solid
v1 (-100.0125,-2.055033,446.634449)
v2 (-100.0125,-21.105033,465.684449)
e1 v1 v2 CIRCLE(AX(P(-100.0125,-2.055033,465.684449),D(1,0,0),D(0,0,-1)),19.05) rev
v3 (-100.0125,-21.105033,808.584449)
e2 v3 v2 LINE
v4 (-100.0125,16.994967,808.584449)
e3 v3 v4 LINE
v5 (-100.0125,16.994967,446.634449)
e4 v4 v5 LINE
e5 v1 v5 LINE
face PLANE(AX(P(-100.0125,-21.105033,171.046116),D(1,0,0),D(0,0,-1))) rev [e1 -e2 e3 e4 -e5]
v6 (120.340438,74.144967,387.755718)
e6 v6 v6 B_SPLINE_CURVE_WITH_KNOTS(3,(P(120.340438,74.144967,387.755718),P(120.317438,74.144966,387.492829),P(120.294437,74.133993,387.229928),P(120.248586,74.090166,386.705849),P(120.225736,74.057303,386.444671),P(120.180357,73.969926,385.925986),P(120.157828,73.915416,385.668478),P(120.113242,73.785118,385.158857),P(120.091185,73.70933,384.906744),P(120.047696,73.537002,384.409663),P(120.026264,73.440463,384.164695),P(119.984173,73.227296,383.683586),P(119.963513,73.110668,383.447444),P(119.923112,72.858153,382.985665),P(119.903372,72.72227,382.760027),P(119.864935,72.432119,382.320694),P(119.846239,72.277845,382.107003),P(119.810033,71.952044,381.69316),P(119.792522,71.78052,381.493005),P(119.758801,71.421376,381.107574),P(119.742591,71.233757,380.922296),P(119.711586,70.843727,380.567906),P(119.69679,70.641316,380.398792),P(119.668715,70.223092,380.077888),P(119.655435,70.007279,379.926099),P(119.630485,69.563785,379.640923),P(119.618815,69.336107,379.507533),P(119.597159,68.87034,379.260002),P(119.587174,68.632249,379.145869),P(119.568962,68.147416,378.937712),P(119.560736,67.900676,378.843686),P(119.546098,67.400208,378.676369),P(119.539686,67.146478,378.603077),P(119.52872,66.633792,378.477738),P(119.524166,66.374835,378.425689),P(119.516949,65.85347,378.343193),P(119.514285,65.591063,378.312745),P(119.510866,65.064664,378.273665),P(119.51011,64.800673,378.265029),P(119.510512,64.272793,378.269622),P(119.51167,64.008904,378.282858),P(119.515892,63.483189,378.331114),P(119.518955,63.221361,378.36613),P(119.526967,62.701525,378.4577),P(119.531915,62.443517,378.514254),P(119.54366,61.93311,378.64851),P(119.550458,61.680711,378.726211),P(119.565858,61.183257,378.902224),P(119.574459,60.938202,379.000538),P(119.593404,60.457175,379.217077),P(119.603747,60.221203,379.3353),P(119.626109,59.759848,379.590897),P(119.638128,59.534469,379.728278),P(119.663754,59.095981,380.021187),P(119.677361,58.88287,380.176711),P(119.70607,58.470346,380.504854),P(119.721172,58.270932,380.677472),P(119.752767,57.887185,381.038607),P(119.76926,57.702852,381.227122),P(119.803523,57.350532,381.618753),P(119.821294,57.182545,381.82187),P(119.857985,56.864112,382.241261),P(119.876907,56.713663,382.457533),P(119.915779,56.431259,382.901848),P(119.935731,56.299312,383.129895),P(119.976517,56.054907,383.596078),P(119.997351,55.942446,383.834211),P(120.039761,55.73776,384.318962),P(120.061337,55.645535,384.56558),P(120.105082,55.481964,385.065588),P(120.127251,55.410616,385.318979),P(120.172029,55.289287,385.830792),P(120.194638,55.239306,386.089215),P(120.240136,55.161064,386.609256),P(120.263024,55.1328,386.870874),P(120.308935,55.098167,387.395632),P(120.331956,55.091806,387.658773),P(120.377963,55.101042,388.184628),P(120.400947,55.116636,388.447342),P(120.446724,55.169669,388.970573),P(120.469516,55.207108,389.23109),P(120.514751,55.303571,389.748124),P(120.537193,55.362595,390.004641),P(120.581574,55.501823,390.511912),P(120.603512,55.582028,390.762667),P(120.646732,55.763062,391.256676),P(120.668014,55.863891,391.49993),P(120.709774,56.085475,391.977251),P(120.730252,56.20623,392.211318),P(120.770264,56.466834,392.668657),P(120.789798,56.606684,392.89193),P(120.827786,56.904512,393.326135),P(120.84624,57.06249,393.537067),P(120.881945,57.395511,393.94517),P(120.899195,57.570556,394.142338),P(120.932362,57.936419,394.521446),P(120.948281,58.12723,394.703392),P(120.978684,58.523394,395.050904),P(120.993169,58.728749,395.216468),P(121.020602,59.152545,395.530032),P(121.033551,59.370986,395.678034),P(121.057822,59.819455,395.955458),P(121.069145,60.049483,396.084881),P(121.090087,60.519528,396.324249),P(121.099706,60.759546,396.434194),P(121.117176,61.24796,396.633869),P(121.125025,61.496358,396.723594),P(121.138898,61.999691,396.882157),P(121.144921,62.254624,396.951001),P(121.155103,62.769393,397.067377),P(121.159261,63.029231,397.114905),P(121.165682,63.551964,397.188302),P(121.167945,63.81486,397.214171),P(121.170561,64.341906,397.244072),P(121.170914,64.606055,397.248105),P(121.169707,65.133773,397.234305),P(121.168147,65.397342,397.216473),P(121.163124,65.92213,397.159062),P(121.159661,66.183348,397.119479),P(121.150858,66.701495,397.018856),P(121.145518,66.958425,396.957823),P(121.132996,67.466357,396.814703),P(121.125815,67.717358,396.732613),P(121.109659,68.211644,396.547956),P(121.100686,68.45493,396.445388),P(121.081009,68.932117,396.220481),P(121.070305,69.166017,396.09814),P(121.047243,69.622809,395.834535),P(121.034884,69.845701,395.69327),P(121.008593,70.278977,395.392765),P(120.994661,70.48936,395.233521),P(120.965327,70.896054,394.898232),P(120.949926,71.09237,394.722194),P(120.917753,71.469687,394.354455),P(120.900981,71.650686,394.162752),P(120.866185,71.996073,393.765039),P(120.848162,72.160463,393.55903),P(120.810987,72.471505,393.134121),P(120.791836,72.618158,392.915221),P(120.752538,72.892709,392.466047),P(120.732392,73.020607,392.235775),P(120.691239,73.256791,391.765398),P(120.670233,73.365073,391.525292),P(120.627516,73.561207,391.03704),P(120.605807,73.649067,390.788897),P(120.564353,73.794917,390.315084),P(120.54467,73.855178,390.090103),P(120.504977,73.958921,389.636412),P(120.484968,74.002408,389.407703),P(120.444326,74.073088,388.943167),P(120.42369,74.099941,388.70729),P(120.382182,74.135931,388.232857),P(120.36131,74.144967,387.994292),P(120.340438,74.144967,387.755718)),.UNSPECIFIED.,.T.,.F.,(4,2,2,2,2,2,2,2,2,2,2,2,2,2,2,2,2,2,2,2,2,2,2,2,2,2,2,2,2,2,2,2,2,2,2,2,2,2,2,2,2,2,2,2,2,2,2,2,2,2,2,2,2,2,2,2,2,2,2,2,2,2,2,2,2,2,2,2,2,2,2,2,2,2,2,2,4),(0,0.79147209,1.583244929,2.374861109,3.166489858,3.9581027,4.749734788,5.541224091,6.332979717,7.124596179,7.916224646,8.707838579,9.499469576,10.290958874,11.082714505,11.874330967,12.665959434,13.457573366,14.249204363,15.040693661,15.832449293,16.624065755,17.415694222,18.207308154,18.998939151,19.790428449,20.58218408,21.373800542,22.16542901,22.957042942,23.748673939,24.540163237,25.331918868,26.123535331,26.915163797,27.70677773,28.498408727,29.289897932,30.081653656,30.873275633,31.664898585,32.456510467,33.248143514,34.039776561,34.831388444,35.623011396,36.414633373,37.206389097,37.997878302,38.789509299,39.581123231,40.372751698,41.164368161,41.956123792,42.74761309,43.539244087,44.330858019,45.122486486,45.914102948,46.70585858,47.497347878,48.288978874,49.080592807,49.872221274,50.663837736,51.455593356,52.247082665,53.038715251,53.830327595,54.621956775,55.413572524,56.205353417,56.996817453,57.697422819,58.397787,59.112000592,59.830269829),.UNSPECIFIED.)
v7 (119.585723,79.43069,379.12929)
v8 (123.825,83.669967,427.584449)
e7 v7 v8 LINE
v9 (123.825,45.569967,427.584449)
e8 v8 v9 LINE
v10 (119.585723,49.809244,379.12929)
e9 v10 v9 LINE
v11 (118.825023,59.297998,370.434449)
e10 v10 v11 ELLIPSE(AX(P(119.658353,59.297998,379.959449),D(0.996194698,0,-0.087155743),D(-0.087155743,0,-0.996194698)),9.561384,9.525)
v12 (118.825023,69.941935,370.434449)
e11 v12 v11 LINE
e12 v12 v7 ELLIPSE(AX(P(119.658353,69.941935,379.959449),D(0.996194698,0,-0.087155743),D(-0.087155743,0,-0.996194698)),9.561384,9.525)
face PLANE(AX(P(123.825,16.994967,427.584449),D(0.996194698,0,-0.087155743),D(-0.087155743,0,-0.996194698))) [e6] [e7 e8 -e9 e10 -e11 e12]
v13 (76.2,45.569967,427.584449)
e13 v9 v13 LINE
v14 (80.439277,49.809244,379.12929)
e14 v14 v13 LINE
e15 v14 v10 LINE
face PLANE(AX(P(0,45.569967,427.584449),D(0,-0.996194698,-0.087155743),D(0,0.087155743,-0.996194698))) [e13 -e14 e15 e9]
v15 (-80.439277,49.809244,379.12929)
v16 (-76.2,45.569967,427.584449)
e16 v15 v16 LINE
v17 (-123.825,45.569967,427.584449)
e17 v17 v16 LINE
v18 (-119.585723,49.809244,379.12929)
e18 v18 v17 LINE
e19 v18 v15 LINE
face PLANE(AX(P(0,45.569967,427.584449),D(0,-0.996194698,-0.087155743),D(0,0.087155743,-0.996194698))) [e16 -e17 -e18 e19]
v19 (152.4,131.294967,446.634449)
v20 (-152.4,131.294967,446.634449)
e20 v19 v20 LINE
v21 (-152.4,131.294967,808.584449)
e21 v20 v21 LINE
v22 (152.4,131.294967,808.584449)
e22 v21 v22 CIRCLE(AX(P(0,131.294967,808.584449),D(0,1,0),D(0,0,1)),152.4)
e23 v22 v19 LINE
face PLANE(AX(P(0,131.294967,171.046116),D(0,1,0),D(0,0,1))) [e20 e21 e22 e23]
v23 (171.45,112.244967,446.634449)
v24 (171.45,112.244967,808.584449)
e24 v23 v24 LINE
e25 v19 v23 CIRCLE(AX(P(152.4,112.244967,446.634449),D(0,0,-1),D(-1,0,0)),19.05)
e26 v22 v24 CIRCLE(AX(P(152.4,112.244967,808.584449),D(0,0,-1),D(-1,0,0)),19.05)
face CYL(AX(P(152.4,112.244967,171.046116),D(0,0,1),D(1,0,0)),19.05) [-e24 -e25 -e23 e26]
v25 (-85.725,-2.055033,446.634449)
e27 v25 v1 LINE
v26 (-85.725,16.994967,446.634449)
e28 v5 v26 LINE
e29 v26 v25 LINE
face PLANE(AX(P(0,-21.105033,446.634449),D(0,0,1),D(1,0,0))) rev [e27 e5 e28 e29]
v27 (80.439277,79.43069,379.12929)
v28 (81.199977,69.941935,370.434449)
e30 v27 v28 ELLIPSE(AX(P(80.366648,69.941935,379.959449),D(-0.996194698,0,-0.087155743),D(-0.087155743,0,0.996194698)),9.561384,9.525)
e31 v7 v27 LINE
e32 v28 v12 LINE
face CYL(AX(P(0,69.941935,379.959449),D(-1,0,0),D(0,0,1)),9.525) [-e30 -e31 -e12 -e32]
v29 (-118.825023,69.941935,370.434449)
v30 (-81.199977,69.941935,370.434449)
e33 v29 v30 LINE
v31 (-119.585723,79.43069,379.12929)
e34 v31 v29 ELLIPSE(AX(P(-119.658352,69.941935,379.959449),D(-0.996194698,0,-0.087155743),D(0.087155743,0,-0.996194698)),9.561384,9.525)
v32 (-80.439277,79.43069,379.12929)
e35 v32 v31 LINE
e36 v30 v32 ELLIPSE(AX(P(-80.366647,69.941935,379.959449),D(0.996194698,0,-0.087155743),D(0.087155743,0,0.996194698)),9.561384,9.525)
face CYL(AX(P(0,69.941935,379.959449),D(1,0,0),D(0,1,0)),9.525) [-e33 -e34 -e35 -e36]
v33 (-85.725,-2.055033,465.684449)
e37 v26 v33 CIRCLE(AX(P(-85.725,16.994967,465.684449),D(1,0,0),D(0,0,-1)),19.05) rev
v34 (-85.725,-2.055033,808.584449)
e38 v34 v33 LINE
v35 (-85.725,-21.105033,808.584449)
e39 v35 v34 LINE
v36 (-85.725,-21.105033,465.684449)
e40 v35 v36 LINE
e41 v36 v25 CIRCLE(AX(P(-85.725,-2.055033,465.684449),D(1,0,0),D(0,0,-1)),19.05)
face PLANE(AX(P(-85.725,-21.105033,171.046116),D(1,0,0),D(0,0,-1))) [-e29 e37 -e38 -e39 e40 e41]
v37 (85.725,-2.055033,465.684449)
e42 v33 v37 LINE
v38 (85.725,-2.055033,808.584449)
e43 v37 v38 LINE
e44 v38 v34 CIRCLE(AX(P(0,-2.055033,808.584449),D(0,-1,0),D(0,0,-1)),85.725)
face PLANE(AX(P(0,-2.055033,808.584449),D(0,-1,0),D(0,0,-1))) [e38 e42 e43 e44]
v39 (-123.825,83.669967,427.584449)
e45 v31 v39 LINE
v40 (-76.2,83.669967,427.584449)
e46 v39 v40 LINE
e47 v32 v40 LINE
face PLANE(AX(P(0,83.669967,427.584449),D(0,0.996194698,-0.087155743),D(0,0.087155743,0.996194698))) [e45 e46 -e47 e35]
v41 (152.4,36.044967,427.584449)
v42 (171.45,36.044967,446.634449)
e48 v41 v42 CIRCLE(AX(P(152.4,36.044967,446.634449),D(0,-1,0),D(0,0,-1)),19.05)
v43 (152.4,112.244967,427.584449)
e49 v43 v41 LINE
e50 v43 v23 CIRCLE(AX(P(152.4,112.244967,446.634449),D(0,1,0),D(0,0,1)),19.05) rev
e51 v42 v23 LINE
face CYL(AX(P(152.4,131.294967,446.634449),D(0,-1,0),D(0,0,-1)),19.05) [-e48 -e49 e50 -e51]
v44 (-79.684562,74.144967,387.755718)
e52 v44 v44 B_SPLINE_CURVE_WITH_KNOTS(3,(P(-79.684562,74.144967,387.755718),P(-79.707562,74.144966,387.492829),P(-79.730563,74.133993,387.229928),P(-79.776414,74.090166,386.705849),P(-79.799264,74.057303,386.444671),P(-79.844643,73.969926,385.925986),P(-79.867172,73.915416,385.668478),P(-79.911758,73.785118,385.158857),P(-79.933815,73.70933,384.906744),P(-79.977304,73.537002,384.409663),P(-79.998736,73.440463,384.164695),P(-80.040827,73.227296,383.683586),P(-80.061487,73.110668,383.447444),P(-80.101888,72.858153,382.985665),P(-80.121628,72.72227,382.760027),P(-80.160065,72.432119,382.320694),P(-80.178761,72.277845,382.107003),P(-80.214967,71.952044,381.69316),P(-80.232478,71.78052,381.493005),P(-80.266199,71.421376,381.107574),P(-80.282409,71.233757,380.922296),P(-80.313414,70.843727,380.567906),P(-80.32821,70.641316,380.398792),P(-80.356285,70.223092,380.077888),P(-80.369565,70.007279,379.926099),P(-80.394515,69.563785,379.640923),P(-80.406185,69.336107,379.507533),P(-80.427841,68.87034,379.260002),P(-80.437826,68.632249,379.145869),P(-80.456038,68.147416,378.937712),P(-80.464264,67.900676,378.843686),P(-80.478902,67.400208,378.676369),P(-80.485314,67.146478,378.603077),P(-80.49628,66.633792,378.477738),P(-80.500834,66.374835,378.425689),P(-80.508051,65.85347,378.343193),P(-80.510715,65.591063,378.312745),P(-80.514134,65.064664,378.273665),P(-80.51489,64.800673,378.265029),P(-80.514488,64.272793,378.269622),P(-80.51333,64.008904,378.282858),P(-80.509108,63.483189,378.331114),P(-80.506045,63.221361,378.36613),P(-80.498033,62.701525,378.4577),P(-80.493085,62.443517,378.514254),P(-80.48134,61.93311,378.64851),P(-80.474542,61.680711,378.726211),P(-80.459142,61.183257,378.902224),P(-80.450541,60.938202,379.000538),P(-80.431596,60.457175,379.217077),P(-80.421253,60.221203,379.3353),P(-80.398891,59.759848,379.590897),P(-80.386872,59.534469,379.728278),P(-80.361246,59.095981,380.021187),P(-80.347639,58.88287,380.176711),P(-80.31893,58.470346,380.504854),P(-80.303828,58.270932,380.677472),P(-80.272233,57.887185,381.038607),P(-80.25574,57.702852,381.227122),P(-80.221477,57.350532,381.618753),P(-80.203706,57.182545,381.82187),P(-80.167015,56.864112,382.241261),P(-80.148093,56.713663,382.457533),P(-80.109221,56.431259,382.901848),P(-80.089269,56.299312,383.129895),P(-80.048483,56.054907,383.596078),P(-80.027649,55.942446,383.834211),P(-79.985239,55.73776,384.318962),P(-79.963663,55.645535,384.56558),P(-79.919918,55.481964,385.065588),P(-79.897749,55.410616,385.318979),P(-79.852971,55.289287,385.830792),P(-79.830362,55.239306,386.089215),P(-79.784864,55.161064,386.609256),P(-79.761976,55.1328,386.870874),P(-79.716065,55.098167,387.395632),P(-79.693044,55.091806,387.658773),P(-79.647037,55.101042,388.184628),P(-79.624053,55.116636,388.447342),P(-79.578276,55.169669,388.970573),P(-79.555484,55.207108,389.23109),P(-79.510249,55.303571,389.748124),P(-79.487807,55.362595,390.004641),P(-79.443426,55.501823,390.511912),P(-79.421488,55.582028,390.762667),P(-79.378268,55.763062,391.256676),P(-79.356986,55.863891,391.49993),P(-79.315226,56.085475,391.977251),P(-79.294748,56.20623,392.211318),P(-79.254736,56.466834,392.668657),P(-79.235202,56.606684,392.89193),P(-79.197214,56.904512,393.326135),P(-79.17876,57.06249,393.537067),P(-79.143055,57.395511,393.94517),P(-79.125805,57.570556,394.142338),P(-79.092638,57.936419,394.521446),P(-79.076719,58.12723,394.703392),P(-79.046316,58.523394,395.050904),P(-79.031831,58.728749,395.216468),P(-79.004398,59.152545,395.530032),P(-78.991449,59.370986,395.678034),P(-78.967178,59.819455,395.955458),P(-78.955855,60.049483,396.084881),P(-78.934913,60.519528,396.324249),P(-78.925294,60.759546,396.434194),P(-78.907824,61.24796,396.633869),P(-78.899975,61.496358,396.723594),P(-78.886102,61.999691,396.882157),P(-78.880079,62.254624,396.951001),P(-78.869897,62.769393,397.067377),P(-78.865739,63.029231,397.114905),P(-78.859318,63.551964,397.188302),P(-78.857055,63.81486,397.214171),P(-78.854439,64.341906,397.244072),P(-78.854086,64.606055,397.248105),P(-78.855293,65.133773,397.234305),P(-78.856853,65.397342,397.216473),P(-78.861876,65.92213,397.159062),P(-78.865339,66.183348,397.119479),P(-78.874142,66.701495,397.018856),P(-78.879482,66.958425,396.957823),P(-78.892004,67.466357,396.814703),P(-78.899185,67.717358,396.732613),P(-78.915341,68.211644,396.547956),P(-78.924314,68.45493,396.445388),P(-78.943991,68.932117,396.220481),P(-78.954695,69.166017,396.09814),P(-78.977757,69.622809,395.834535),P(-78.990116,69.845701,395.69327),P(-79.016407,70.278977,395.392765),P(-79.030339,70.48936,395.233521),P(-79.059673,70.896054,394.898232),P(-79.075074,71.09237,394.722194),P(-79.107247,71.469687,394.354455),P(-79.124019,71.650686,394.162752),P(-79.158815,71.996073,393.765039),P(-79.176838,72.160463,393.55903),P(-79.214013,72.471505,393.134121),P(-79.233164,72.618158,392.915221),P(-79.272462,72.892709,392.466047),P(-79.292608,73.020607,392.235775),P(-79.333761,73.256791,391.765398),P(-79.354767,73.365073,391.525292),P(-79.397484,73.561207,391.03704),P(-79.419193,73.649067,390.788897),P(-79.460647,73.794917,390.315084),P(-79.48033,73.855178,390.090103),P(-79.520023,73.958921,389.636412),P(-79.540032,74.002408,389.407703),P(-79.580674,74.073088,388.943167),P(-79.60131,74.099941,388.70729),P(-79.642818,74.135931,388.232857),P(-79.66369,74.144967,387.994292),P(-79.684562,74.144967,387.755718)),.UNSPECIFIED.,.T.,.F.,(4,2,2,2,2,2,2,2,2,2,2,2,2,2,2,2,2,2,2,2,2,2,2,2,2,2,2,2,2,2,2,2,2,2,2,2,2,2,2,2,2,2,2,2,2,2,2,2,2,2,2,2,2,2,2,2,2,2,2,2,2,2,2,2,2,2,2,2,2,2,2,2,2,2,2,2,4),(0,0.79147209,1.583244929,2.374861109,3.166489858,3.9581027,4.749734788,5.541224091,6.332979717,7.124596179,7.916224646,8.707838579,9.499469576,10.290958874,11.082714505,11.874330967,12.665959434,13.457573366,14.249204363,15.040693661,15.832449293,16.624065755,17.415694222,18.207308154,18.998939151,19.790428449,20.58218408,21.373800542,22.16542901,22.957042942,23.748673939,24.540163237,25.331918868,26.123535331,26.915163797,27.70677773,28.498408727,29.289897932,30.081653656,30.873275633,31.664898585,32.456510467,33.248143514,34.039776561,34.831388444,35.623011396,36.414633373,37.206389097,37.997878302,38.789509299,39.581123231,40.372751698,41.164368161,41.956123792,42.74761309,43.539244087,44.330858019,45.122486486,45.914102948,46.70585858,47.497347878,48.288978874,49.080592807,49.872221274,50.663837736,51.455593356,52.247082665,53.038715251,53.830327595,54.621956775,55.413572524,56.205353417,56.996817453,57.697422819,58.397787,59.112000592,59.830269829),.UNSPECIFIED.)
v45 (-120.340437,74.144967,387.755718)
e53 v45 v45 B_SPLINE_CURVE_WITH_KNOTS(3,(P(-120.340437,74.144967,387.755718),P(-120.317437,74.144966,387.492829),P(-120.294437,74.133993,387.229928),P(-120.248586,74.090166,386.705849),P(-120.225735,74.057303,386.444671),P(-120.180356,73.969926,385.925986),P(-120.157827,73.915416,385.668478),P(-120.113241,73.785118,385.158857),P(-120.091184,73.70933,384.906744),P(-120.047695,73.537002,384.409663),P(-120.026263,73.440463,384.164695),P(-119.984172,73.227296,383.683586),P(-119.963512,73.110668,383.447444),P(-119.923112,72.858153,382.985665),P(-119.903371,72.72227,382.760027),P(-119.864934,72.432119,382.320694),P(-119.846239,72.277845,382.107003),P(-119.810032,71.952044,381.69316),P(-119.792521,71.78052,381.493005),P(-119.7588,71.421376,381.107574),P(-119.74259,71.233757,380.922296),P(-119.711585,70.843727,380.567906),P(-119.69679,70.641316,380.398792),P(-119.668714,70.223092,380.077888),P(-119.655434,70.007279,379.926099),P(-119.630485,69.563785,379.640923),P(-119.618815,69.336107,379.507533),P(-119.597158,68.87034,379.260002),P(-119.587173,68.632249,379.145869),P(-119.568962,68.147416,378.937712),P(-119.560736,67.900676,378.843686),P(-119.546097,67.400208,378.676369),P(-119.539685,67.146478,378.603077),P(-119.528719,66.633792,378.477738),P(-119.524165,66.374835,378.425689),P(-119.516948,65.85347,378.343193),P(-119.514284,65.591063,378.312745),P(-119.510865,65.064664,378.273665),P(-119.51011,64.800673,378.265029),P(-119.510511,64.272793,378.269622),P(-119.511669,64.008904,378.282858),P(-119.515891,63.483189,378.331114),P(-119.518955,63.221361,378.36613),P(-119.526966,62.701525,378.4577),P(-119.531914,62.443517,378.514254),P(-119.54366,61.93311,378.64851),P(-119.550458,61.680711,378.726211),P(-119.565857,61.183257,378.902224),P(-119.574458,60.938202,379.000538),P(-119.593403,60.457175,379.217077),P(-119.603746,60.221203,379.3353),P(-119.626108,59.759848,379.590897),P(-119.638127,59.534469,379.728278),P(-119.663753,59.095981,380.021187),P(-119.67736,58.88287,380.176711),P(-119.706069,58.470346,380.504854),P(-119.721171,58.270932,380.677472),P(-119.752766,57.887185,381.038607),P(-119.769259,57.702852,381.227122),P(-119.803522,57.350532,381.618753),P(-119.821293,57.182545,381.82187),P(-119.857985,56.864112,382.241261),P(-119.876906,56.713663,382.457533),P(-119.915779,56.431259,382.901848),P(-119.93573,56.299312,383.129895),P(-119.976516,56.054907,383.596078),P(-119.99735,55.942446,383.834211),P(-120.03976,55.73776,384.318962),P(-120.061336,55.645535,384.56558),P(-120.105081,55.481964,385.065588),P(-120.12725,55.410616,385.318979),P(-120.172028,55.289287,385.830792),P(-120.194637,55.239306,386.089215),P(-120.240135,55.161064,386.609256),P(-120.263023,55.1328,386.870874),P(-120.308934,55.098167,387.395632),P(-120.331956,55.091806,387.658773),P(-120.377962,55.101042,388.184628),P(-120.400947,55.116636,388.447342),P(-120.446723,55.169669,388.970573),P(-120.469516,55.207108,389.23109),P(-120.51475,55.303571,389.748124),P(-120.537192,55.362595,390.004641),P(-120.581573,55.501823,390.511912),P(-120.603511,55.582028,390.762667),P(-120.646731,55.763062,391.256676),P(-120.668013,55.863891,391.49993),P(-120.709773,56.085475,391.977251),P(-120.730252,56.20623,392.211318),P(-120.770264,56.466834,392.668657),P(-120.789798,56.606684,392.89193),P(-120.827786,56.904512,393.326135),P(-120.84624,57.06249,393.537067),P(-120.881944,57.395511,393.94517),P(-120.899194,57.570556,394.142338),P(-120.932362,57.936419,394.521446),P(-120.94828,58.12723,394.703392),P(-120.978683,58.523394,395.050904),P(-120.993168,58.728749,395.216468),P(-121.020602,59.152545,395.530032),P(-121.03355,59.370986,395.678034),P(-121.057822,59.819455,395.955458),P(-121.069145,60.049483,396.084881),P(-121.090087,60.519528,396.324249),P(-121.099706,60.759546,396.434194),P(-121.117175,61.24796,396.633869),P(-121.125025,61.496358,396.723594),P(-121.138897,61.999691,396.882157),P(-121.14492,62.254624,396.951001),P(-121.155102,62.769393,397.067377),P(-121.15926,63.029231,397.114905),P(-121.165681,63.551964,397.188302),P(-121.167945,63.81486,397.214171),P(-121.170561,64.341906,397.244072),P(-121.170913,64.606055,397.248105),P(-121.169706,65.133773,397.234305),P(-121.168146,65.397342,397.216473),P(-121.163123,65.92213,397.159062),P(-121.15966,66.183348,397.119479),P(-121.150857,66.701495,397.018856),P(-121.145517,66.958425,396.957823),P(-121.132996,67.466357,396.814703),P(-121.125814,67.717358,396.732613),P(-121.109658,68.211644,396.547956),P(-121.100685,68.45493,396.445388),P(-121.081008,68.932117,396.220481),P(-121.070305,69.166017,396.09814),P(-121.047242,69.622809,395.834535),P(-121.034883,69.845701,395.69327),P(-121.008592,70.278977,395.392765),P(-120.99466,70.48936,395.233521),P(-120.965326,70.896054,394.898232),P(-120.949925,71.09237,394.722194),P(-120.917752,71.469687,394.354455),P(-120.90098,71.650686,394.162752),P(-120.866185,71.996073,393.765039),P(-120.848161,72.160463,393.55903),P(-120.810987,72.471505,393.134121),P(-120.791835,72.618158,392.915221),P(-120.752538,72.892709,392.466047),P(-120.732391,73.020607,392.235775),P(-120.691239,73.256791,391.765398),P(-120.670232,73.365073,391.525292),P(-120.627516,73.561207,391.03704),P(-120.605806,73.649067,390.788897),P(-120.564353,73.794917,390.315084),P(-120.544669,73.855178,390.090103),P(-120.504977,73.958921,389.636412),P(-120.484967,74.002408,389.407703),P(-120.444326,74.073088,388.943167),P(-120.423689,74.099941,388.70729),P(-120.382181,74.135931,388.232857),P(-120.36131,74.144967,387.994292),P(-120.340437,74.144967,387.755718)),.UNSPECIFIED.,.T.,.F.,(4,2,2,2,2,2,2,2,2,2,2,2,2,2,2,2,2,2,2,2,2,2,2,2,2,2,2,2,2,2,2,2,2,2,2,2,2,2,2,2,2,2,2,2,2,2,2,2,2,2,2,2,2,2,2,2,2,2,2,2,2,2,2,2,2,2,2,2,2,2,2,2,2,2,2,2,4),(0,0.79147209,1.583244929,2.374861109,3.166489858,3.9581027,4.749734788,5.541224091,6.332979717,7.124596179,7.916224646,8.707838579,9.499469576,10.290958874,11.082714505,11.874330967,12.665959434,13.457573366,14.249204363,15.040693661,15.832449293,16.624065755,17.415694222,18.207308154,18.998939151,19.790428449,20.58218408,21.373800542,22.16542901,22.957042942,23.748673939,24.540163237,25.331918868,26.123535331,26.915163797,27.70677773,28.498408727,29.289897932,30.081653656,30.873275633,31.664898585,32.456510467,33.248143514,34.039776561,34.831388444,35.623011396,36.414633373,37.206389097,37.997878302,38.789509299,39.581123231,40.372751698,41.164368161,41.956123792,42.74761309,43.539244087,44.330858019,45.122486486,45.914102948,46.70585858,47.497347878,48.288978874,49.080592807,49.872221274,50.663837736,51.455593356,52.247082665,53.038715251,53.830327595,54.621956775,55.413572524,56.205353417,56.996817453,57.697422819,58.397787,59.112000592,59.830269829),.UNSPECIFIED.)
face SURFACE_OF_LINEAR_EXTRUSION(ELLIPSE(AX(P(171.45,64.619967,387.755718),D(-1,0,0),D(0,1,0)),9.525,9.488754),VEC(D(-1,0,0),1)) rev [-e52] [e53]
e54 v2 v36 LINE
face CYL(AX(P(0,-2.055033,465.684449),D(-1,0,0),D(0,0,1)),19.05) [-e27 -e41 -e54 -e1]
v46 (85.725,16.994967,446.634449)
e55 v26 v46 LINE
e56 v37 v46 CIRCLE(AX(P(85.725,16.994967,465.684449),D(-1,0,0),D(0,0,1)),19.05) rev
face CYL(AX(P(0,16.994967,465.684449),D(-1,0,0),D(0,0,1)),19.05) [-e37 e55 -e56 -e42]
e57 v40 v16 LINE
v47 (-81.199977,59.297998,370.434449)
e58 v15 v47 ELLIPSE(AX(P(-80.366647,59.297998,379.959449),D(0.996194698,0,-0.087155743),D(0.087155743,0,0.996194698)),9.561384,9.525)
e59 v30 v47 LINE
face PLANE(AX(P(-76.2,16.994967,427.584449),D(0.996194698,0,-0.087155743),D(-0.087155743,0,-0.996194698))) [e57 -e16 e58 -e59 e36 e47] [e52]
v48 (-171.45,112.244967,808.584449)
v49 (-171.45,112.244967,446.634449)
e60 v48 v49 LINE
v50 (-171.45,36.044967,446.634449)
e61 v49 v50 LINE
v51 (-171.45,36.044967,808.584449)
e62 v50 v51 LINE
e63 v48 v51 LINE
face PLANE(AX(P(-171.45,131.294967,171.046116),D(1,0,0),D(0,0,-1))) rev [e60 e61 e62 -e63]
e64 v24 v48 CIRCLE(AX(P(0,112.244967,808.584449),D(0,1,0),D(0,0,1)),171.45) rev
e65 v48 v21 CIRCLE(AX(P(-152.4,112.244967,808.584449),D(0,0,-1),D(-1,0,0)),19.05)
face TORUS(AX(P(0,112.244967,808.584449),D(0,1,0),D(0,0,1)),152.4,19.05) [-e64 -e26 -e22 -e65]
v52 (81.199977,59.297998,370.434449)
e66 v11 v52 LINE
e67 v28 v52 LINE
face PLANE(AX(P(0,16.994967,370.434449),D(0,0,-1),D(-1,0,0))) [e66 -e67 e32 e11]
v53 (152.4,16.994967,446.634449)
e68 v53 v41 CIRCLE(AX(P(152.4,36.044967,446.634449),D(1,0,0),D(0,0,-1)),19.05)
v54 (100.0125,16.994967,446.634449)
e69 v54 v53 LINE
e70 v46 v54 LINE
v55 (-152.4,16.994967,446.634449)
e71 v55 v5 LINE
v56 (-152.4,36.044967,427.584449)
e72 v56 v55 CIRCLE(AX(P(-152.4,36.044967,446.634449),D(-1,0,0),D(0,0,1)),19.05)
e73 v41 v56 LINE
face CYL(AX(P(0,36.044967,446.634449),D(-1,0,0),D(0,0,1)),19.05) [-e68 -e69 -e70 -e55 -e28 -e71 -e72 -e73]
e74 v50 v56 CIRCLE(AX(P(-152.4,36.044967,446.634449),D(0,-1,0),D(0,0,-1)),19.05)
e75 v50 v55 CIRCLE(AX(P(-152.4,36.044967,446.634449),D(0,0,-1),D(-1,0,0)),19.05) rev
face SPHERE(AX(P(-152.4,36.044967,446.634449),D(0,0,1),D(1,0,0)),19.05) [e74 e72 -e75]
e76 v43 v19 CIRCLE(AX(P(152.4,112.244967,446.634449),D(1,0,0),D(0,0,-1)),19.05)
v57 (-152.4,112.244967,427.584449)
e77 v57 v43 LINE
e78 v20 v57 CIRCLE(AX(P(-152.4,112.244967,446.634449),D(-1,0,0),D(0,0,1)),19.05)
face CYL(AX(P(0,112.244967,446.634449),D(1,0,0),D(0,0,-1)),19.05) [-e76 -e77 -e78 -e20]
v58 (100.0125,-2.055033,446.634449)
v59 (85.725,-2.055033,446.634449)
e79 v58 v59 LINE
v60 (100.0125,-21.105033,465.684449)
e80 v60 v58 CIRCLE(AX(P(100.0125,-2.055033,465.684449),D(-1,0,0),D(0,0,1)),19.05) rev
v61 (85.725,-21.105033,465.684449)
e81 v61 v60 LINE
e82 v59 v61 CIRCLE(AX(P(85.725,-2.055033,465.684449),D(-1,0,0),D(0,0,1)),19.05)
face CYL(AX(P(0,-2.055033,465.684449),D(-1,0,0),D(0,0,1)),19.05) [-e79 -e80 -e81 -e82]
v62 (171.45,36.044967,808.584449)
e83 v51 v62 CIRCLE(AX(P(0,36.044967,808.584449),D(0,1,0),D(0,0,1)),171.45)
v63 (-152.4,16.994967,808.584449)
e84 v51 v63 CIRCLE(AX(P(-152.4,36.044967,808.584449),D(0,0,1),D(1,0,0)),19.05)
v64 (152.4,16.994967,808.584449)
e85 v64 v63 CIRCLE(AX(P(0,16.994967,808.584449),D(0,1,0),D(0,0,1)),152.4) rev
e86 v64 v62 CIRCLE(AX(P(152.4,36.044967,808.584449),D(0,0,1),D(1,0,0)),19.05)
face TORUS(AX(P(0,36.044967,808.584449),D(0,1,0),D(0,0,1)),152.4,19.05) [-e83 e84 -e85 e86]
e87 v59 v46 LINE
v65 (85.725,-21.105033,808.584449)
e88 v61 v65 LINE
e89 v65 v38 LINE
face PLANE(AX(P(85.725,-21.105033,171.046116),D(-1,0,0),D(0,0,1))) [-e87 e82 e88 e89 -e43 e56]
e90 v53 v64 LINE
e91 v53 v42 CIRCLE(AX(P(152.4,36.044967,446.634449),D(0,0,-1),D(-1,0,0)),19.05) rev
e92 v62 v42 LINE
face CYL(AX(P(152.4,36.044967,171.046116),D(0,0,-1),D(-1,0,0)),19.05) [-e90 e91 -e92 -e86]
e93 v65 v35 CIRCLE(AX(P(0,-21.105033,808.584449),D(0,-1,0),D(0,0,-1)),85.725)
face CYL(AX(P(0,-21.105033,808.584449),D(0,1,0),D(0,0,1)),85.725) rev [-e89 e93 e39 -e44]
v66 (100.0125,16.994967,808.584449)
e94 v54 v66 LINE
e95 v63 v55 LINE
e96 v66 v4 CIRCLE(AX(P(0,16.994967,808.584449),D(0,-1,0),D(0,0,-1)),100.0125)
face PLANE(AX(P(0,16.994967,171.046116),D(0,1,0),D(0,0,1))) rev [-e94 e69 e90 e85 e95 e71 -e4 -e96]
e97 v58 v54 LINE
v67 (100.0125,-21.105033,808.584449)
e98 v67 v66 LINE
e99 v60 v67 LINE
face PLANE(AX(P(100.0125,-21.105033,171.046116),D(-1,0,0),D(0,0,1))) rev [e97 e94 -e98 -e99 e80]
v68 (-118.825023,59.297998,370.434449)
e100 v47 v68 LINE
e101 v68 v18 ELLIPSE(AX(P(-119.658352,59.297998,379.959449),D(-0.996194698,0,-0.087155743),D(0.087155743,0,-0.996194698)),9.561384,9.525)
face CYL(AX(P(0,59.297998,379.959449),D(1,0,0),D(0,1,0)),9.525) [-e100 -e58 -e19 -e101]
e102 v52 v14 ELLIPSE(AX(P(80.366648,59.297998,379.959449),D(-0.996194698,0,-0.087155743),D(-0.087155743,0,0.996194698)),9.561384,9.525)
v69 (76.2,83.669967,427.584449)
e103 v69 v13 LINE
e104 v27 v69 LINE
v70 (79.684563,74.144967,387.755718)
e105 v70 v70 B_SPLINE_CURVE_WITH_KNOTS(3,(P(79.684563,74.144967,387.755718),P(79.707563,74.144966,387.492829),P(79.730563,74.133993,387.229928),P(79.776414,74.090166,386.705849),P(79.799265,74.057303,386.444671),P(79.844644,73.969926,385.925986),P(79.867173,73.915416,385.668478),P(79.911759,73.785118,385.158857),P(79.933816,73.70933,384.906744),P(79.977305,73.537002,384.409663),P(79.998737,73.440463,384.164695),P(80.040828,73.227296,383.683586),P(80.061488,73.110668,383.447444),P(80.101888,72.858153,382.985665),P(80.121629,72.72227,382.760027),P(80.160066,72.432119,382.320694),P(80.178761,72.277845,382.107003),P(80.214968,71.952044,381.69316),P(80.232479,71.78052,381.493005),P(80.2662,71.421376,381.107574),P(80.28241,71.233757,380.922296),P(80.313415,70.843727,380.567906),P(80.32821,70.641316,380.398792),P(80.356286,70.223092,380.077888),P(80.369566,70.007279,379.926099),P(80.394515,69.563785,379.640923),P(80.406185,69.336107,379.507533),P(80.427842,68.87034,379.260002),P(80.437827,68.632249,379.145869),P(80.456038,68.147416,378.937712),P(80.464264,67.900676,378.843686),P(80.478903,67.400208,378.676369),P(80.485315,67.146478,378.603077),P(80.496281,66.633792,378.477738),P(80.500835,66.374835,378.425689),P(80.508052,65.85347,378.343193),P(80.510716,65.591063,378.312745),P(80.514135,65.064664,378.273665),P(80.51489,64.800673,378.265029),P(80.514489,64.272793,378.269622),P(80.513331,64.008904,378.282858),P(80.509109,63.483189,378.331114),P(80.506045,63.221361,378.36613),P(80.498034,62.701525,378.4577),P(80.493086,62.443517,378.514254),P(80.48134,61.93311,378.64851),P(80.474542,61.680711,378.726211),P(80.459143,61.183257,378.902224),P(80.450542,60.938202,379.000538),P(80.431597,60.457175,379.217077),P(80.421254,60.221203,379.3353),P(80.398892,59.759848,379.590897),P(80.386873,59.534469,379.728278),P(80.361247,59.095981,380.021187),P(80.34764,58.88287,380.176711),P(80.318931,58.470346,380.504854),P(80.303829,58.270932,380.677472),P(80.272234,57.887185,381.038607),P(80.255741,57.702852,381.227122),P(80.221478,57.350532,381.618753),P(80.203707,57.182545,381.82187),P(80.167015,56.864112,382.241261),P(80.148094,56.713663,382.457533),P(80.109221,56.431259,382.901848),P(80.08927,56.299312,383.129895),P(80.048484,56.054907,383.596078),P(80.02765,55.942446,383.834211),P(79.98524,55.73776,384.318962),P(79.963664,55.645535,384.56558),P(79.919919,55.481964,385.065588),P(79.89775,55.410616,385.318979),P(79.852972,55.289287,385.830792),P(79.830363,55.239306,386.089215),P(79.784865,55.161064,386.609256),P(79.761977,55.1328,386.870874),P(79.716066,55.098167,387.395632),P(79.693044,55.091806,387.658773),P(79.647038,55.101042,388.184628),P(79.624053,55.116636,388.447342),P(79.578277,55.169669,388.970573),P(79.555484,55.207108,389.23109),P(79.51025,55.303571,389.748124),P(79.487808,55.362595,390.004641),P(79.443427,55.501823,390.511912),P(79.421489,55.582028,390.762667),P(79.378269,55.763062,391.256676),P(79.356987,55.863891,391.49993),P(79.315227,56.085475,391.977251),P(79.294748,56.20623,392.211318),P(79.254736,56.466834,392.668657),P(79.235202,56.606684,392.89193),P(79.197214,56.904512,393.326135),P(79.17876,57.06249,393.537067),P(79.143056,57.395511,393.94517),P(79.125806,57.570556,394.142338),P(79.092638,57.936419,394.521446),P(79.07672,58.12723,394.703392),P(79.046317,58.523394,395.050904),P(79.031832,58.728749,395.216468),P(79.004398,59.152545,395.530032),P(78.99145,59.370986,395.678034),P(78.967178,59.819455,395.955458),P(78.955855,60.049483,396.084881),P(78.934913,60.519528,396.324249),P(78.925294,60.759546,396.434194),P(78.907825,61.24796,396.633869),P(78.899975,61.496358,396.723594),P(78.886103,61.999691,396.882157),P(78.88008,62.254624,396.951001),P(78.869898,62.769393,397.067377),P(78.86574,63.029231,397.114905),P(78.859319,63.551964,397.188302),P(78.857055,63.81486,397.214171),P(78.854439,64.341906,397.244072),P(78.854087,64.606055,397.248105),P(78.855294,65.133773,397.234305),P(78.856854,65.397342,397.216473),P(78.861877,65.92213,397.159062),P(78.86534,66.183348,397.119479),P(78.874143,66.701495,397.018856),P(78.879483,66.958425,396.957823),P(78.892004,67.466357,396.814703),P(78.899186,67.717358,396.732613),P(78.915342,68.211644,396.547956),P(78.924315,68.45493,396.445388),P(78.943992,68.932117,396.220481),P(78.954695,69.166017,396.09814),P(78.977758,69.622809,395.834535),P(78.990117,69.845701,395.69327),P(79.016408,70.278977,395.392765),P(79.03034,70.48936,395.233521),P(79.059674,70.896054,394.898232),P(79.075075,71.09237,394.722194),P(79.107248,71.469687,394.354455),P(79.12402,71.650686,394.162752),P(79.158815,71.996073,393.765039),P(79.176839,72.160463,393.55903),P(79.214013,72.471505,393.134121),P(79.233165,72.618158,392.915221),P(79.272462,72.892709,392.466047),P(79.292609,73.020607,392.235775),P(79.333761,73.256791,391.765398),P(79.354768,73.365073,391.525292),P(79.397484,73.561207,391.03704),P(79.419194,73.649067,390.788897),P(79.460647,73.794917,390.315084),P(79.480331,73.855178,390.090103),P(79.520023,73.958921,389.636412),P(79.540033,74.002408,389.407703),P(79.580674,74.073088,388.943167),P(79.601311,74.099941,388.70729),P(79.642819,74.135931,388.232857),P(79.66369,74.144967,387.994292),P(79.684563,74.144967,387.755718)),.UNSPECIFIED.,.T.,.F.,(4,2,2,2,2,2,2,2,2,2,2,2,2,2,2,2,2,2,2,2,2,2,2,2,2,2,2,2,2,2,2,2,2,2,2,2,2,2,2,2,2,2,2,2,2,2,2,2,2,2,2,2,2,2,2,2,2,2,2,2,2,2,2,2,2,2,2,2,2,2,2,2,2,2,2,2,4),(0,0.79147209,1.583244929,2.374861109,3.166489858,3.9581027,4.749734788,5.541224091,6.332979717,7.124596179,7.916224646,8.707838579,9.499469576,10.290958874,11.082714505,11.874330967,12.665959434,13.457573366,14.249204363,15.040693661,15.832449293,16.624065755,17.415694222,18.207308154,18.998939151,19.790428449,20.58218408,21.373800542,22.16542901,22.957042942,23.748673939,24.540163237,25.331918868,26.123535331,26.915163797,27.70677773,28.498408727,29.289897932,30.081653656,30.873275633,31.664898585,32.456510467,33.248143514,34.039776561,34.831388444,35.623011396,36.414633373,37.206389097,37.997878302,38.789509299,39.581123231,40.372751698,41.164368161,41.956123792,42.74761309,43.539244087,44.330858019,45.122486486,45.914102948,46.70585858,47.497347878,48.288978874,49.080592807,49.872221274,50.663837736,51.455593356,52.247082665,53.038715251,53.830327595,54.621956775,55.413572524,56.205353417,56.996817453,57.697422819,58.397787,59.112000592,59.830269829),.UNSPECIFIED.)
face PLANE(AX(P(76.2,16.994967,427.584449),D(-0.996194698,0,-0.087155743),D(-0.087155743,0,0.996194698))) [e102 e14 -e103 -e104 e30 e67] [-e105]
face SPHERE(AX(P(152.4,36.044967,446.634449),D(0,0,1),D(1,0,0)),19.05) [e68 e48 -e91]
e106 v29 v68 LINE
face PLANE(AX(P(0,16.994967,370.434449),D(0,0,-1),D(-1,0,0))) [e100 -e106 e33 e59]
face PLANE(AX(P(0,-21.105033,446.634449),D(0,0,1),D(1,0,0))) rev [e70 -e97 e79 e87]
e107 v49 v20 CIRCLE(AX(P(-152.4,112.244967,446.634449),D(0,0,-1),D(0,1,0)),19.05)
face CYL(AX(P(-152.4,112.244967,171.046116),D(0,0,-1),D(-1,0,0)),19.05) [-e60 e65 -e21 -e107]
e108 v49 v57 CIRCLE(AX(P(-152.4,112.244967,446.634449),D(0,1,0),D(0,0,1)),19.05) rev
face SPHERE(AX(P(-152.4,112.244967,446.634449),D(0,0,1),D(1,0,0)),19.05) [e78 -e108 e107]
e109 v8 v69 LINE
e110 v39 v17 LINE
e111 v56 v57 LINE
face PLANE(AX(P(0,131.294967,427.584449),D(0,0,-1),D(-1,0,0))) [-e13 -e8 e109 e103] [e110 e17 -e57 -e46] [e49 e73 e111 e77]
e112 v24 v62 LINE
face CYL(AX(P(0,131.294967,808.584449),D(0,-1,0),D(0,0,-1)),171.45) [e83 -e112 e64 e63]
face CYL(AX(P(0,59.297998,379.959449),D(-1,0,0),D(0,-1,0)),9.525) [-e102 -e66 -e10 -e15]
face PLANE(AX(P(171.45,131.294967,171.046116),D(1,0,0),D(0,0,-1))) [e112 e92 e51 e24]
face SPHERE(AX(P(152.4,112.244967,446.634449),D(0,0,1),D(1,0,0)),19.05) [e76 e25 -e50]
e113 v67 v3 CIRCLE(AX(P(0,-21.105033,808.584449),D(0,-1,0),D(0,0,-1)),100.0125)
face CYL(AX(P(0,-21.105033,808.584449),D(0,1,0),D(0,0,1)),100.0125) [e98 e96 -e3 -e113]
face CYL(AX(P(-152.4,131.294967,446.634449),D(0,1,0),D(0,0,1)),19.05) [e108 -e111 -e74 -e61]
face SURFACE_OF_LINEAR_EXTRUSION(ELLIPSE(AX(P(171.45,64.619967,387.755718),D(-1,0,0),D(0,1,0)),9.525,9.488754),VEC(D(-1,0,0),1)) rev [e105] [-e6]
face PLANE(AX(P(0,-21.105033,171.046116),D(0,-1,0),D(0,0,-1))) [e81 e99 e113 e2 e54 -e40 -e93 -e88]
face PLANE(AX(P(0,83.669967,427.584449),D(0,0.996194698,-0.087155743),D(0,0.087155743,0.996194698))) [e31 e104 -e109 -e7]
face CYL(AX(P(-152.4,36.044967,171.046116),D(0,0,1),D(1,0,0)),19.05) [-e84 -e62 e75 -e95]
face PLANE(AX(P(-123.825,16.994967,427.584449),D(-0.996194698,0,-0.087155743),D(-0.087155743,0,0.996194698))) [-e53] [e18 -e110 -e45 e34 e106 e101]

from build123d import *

# Parameters (mm, degrees)
BOSS_EXTRUDE1_DEPTH           = 152.4
FILLET1_R                     = 25.4
BOSS_EXTRUDE2_DEPTH           = 50.8
BOSS_EXTRUDE3_DEPTH           = 25.4
FILLET2_R                     = 25.4
SKETCH5_W                     = 63.5
SKETCH5_H                     = 50.8
BOSS_EXTRUDE4_DEPTH           = 76.2
BOSS_EXTRUDE4_DRAFT           = 5
BOSS_EXTRUDE4_PROFILE_2_DEPTH = 76.2
BOSS_EXTRUDE4_PROFILE_2_DRAFT = 5
FILLET3_R                     = 12.7
SKETCH7_RX                    = 12.7
SKETCH7_RY                    = 12.651672666
CUT_EXTRUDE2_DEPTH            = 1182.416868754
SCALE1_SCALE                  = 0.75


with BuildPart() as part:
    # Sketch1 → Boss-Extrude1 (new body)
    with BuildSketch(Plane(origin=(0, 0, 0), x_dir=(1, 0, 0), z_dir=(0, 1, 0))):
        with BuildLine():
            Line((228.6, -342.051110312), (-228.6, -342.051110312))
            Line((-228.6, -342.051110312), (-228.6, -850.051110312))
            ThreePointArc((-228.6, -850.051110312), (0, -1078.651110312), (228.6, -850.051110312))
            Line((228.6, -850.051110312), (228.6, -342.051110312))
        make_face()
    extrude(amount=BOSS_EXTRUDE1_DEPTH)

    # Fillet1
    fillet1_edges = [part.edges().sort_by_distance(p)[0] for p in [
        (-228.6, 152.4, 596.051110312),
        (0, 152.4, 1078.651110312),
        (228.6, 152.4, 596.051110312),
        (0, 152.4, 342.051110312),
        (228.6, 0, 596.051110312),
        (0, 0, 1078.651110312),
        (-228.6, 0, 596.051110312),
        (0, 0, 342.051110312),
        (228.6, 76.2, 342.051110312),
        (-228.6, 76.2, 342.051110312),
    ]]
    fillet(fillet1_edges, radius=FILLET1_R)

    # Sketch3 → Boss-Extrude2 (add)
    with BuildSketch(Plane.XZ):
        with BuildLine():
            Line((-133.35, 850.051110312), (-133.35, 367.451110312))
            Line((-133.35, 367.451110312), (-114.3, 367.451110312))
            Line((-114.3, 367.451110312), (-114.3, 850.051110312))
            ThreePointArc((-114.3, 850.051110312), (0, 964.351110312), (114.3, 850.051110312))
            Line((114.3, 850.051110312), (114.3, 367.451110312))
            Line((114.3, 367.451110312), (133.35, 367.451110312))
            Line((133.35, 367.451110312), (133.35, 850.051110312))
            ThreePointArc((133.35, 850.051110312), (0, 983.401110312), (-133.35, 850.051110312))
        make_face()
    extrude(amount=BOSS_EXTRUDE2_DEPTH)

    # Sketch4 → Boss-Extrude3 (add)
    with BuildSketch(Plane.XZ):
        with BuildLine():
            Line((-114.3, 850.051110312), (-114.3, 367.451110312))
            Line((-114.3, 367.451110312), (114.3, 367.451110312))
            Line((114.3, 367.451110312), (114.3, 850.051110312))
            ThreePointArc((114.3, 850.051110312), (0, 964.351110312), (-114.3, 850.051110312))
        make_face()
    extrude(amount=BOSS_EXTRUDE3_DEPTH)

    # Fillet2
    fillet2_edges = [part.edges().sort_by_distance(p)[0] for p in [
        (123.825, -50.8, 367.451110312),
        (-123.825, -50.8, 367.451110312),
        (0, -25.4, 367.451110312),
    ]]
    fillet(fillet2_edges, radius=FILLET2_R - 0.0001)  # a hair under: the kernel refuses the full size


with BuildPart() as boss_extrude4_tool:
    # Sketch5 → Boss-Extrude4 (with draft: the straight prism first)
    with BuildSketch(Plane(origin=(0, 0, 342.051110312), x_dir=(-1, 0, 0), z_dir=(0, 0, -1))):
        with Locations((133.35, 63.5)):
            Rectangle(SKETCH5_W, SKETCH5_H)
    extrude(amount=BOSS_EXTRUDE4_DEPTH)
    # Boss-Extrude4: the draft: its side faces are tilted about the plane it starts from
    boss_extrude4_sides = [boss_extrude4_tool.faces().sort_by_distance(p)[0] for p in [
        (-101.6, 63.5, 303.951110312),
        (-133.35, 38.1, 303.951110312),
        (-165.1, 63.5, 303.951110312),
        (-133.35, 88.9, 303.951110312),
    ]]
    draft(boss_extrude4_sides, Plane(origin=(0, 0, 342.051110312), x_dir=(-1, 0, 0), z_dir=(0, 0, -1)), BOSS_EXTRUDE4_DRAFT)


with BuildPart() as part_1:
    add(part.part)

    # Boss-Extrude4: add boss_extrude4_tool
    add(boss_extrude4_tool.part)


with BuildPart() as boss_extrude4_profile_2_tool:
    # Sketch5 → Boss-Extrude4 profile 2 (with draft: the straight prism first)
    with BuildSketch(Plane(origin=(0, 0, 342.051110312), x_dir=(-1, 0, 0), z_dir=(0, 0, -1))):
        with Locations((-133.35, 63.5)):
            Rectangle(SKETCH5_W, SKETCH5_H)
    extrude(amount=BOSS_EXTRUDE4_PROFILE_2_DEPTH)
    # Boss-Extrude4 profile 2: the draft: its side faces are tilted about the plane it starts from
    boss_extrude4_profile_2_sides = [boss_extrude4_profile_2_tool.faces().sort_by_distance(p)[0] for p in [
        (101.6, 63.5, 303.951110312),
        (133.35, 88.9, 303.951110312),
        (165.1, 63.5, 303.951110312),
        (133.35, 38.1, 303.951110312),
    ]]
    draft(boss_extrude4_profile_2_sides, Plane(origin=(0, 0, 342.051110312), x_dir=(-1, 0, 0), z_dir=(0, 0, -1)), BOSS_EXTRUDE4_PROFILE_2_DRAFT)


with BuildPart() as part_2:
    add(part_1.part)

    # Boss-Extrude4 profile 2: add boss_extrude4_profile_2_tool
    add(boss_extrude4_profile_2_tool.part)

    # Fillet3
    fillet3_edges = [part_2.edges().sort_by_distance(p)[0] for p in [
        (133.35, 82.233363839, 265.851110312),
        (133.35, 44.766636161, 265.851110312),
        (-133.35, 44.766636161, 265.851110312),
        (-133.35, 82.233363839, 265.851110312),
    ]]
    fillet(fillet3_edges, radius=FILLET3_R)

    # Sketch7 → Cut-Extrude2 (cut, through all)
    with BuildSketch(Plane.ZY.offset(228.6)):
        with Locations(Location((288.946136063, 63.5), (0, 0, 90))):
            Ellipse(SKETCH7_RX, SKETCH7_RY)
    extrude(amount=-CUT_EXTRUDE2_DEPTH, mode=Mode.SUBTRACT)


with BuildPart() as part_3:
    # Scale1: scaled about (1.9e-07, 67.979865598, 684.18432939)
    add(part_2.part.scale(SCALE1_SCALE).moved(Location((4.8e-08, 16.9949664, 171.046082348))))


solid = part_3.part
